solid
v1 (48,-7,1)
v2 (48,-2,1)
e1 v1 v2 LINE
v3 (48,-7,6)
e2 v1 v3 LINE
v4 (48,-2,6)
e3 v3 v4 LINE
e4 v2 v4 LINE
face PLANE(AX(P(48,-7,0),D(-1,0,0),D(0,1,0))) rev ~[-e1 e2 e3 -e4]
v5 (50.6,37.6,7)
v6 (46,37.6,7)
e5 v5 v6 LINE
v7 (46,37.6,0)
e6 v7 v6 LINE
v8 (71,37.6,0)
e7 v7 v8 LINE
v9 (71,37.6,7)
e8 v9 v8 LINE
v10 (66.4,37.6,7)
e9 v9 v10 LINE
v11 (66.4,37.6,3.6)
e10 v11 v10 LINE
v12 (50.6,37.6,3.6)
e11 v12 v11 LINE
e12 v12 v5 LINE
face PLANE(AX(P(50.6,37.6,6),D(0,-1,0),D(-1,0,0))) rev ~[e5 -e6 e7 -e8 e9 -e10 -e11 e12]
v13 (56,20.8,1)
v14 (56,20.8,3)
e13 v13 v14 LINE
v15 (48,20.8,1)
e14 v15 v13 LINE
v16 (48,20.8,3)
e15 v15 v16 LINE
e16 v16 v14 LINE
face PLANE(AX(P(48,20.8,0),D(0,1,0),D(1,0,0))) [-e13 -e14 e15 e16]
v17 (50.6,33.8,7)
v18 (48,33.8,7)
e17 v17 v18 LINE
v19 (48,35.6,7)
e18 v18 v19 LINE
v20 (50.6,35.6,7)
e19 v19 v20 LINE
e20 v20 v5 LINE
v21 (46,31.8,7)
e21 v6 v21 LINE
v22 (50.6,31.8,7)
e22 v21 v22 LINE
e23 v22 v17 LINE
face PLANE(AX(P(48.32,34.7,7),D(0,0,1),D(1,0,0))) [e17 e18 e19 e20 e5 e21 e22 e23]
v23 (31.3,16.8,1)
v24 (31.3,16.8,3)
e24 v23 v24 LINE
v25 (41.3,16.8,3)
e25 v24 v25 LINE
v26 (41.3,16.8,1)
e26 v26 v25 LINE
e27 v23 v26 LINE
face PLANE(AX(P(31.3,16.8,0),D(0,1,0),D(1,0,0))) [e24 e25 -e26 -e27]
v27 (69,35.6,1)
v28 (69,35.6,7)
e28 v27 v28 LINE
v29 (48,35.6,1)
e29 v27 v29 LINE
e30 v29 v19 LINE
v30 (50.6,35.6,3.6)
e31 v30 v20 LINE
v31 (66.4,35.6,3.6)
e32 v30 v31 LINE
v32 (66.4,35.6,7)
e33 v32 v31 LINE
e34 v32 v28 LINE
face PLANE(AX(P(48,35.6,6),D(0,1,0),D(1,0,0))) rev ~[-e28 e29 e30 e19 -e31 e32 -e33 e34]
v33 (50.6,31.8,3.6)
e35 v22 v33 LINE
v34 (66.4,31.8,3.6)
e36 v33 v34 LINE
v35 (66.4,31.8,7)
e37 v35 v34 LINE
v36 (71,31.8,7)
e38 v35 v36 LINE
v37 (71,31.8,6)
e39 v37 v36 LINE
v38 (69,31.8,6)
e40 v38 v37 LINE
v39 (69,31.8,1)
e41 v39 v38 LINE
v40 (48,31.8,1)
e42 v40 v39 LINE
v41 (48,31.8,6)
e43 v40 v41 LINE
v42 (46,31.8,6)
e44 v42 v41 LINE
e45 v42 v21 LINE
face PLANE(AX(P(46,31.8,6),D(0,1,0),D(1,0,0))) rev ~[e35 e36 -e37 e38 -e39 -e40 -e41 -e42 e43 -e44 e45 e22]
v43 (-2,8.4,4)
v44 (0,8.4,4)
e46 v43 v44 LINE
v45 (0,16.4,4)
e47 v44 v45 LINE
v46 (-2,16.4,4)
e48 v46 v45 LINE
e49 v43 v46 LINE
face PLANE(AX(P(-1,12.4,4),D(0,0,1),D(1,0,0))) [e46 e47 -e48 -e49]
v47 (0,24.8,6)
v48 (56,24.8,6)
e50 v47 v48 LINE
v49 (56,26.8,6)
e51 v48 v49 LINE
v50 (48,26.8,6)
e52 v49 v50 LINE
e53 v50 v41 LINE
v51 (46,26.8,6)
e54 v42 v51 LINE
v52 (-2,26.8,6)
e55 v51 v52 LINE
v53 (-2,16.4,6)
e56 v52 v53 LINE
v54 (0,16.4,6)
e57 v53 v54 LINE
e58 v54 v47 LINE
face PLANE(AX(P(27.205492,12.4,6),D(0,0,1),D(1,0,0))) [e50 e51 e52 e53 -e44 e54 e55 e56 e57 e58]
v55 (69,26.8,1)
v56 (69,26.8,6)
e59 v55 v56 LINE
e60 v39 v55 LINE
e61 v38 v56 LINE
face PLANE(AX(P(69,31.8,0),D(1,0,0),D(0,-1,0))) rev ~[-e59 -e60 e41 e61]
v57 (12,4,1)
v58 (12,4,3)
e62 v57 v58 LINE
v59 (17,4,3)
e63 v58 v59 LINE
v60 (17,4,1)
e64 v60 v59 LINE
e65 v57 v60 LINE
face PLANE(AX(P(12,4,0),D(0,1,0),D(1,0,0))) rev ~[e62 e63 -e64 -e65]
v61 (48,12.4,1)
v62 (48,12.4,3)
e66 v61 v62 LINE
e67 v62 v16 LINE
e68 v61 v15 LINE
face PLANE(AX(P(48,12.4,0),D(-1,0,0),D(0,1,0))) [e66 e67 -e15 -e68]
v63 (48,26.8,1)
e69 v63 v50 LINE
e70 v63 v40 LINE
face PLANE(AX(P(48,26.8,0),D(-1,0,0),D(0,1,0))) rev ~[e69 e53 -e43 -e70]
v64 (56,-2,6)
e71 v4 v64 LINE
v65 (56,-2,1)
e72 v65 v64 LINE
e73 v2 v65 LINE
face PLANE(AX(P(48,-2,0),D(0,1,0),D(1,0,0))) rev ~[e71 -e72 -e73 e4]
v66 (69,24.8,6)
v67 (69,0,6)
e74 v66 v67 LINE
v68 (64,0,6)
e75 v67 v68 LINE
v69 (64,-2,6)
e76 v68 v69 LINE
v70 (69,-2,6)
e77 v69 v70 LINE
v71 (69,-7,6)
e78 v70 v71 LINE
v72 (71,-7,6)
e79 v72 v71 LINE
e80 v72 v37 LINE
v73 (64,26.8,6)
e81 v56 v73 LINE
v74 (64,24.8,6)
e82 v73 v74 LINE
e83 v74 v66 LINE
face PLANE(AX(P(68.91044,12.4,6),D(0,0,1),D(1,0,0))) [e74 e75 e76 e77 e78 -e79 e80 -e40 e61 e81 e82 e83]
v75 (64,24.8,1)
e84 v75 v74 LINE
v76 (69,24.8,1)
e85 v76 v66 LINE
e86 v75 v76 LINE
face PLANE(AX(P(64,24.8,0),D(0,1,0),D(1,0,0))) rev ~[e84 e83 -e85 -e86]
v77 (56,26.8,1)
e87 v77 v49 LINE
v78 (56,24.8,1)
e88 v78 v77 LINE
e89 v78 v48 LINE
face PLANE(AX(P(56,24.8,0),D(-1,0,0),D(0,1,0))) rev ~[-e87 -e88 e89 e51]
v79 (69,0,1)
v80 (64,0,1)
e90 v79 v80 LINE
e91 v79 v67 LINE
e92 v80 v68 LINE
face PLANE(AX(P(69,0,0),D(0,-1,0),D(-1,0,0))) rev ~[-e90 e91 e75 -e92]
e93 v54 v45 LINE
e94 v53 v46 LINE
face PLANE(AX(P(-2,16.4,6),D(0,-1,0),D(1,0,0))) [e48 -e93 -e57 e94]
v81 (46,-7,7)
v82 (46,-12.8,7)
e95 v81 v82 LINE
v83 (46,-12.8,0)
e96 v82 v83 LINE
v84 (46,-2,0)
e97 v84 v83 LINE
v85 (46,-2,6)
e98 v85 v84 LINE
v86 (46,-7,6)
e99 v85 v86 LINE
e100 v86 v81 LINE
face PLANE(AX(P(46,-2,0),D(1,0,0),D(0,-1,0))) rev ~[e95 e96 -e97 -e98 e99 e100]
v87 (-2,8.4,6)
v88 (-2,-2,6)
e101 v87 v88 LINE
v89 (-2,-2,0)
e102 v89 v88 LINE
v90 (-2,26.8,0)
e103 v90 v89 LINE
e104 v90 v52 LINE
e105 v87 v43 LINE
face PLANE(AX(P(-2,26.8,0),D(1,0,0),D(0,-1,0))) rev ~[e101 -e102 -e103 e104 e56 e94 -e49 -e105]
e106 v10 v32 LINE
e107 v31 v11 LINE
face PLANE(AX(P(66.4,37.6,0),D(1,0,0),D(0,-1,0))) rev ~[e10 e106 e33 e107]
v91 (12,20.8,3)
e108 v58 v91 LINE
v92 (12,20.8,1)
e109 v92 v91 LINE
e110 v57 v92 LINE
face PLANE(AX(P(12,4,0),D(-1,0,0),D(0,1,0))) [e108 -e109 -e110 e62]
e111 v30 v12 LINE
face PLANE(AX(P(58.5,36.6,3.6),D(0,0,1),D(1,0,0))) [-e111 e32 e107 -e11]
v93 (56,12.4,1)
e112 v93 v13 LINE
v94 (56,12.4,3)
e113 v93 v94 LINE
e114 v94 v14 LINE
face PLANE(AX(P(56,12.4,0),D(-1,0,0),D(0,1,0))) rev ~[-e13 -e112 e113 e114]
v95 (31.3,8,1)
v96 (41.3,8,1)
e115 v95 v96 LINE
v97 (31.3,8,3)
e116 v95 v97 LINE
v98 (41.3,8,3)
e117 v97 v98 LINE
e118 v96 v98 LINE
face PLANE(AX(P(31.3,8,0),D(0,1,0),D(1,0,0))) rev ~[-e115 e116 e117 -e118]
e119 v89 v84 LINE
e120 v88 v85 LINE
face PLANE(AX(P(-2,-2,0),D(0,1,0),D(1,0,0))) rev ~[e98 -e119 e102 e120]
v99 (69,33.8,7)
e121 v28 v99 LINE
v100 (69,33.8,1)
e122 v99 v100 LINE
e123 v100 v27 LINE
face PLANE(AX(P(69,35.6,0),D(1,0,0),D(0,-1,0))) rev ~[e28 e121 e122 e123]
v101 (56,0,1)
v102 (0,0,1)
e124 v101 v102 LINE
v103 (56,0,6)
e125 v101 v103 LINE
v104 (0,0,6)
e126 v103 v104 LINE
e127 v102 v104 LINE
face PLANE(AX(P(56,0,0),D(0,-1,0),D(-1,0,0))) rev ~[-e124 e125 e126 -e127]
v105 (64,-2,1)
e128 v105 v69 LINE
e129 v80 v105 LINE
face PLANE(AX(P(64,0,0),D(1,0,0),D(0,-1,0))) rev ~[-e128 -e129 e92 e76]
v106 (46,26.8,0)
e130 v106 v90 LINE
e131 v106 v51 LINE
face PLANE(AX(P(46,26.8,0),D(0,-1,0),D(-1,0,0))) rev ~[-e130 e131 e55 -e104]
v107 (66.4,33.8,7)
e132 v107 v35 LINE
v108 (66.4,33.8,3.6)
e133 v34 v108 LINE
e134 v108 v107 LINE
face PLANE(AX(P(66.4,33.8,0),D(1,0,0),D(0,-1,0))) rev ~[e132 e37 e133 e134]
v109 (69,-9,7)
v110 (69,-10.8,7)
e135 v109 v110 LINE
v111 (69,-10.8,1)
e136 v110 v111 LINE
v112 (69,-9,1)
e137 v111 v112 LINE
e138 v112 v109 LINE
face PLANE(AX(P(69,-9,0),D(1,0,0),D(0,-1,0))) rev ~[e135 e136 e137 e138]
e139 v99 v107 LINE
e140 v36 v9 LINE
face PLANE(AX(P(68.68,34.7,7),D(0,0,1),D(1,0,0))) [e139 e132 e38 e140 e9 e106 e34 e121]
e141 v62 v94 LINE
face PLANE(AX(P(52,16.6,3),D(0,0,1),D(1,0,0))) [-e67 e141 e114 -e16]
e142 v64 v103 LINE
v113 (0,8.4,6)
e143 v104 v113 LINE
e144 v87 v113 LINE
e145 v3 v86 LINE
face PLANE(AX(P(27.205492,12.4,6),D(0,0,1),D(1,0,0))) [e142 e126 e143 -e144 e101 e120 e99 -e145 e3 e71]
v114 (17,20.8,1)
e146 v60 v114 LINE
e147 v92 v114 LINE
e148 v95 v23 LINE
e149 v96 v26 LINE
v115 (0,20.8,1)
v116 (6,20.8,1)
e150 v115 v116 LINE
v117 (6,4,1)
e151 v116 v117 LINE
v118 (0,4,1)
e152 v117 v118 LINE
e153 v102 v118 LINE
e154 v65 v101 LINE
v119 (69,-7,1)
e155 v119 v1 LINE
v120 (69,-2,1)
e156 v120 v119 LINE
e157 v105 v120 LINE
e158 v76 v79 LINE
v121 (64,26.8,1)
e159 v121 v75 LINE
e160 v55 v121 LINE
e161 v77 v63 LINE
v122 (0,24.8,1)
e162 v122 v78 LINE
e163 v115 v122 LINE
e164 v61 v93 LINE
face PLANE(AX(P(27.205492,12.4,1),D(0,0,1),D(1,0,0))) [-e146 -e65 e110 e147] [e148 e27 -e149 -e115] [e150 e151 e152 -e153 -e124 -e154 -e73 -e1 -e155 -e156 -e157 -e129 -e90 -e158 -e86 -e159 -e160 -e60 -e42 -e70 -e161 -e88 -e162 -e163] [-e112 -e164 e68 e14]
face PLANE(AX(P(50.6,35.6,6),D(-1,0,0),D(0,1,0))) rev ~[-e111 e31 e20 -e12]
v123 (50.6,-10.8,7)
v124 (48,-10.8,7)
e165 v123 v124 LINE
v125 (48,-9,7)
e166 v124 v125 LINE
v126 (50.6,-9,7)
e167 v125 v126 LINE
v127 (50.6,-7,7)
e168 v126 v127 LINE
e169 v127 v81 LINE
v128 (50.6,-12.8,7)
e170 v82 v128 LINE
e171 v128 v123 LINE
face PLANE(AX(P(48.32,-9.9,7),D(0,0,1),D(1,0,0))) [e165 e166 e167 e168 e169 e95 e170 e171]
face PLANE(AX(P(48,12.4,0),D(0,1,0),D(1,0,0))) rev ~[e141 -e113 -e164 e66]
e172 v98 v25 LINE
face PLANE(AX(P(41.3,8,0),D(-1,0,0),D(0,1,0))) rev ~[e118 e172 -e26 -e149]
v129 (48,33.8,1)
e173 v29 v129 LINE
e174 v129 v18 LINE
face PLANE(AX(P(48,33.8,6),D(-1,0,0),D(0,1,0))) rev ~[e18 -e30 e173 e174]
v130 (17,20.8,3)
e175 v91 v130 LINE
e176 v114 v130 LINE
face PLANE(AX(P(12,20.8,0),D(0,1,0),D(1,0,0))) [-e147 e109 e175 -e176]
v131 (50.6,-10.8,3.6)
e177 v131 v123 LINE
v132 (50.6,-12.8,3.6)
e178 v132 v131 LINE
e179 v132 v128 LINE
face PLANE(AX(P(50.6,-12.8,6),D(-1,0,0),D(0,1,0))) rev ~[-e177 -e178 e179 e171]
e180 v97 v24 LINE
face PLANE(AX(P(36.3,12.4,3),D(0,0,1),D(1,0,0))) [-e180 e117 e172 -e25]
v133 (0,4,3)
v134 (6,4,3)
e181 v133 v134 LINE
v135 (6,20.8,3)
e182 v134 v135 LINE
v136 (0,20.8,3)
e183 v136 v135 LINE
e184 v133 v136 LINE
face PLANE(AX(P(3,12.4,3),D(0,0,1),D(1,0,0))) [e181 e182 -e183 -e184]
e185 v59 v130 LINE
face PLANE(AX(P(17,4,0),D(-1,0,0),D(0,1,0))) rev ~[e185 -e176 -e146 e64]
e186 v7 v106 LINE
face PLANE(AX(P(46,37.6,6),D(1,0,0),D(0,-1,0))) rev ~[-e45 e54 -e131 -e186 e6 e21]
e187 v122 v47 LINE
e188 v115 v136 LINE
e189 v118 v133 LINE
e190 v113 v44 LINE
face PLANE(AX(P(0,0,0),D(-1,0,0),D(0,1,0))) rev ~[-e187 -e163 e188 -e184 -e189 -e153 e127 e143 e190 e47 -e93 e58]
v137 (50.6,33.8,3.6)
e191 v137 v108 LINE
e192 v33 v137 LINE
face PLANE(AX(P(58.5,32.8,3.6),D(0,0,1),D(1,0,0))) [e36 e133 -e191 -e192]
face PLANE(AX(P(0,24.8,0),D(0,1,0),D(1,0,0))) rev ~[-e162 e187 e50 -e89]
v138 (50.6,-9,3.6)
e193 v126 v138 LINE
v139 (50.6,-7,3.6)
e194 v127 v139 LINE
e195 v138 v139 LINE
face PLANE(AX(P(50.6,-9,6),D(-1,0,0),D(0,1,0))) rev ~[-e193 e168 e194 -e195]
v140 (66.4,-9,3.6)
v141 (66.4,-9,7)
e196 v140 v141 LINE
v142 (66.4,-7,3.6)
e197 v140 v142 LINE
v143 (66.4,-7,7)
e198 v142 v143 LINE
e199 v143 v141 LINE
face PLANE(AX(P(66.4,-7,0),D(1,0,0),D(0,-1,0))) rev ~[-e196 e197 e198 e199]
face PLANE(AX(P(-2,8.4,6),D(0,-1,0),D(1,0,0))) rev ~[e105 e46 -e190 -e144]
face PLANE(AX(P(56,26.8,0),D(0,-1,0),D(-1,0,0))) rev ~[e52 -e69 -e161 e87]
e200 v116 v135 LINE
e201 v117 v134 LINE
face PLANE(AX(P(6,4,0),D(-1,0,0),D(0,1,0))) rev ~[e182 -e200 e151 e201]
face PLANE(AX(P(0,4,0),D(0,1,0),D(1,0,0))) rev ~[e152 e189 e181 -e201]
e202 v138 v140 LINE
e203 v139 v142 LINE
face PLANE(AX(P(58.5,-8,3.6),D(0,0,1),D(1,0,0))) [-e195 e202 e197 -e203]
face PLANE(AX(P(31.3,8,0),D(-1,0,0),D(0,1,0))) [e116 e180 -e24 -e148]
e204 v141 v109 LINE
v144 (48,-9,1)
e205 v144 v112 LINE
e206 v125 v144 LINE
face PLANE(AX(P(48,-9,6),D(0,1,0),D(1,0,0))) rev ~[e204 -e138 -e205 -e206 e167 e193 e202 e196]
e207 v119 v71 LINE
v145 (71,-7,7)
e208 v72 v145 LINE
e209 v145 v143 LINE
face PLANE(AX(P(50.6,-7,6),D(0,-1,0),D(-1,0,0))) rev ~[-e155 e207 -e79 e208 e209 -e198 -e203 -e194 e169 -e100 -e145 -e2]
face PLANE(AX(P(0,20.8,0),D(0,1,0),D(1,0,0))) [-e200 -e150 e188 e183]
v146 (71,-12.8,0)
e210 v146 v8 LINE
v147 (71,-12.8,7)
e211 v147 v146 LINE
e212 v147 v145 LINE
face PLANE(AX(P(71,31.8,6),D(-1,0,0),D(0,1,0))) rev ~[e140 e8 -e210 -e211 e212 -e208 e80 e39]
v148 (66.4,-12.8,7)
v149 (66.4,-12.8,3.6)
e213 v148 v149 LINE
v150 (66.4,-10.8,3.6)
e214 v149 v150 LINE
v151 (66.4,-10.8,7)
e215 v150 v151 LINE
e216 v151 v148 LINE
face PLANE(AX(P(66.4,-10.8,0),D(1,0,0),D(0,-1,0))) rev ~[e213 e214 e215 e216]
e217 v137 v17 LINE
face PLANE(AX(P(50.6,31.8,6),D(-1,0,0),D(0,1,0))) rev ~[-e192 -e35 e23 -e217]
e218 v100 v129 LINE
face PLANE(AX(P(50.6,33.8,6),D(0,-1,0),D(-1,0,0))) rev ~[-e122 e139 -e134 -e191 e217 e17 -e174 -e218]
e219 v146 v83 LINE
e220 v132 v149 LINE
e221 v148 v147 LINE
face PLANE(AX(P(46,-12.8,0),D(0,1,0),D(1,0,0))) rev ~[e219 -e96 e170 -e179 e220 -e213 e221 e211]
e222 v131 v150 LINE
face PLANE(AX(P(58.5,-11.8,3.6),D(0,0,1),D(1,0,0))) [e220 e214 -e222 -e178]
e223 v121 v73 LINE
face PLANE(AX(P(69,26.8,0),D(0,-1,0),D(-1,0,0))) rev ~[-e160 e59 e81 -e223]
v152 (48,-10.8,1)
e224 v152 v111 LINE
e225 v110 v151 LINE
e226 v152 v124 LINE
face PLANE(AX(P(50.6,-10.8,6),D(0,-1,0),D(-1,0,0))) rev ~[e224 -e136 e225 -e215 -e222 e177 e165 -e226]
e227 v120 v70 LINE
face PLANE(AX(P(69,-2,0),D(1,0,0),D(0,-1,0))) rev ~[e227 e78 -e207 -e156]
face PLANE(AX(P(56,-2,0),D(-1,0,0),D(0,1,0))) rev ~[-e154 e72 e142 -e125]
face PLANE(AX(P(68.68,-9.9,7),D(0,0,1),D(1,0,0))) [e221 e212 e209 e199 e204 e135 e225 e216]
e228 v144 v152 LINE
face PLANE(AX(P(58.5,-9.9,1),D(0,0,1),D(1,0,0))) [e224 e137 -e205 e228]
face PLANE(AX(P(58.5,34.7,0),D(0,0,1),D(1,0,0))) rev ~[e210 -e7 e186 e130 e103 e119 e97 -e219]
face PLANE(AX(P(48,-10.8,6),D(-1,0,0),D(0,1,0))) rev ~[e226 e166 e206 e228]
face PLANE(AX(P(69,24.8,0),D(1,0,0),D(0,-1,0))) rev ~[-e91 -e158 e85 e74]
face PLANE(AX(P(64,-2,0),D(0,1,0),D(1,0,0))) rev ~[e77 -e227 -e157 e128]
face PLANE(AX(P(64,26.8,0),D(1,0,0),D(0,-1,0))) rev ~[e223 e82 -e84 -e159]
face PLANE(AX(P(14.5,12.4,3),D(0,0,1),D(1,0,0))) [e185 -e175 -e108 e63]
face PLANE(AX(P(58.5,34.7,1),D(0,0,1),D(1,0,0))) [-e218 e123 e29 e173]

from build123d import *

# Parameters (mm, degrees)
F0_W      = 6
F0_H      = 16.8
F1_DEPTH  = 3
F0_W_2    = 5
F0_W_3    = 10
F0_H_2    = 8.8
F0_W_4    = 8
F0_H_3    = 8.4
F2_DEPTH  = 6
F0_W_5    = 15.8
F0_H_4    = 2
F3_DEPTH  = 3.6
F4_DEPTH  = 1
F7_DEPTH  = 1
F8_DEPTH  = 1
F9_W      = 2
F9_H      = 8
F10_DEPTH = 2


# Not quite as in the source:
# - a feature names something its author has since deleted; it is built from what else it names


with BuildPart() as f1:
    # F0 (on Top) → F1 (new body)
    with BuildSketch(Plane.XY):
        with Locations((3, 12.4)):
            Rectangle(F0_W, F0_H)
    extrude(amount=F1_DEPTH)

    # F0 (on Top) → F2 (join)
    with BuildSketch(Plane.XY):
        Polygon((0, 4), (0, 20.8), (0, 24.8), (56, 24.8), (56, 26.8), (48, 26.8), (48, 31.8), (50.6, 31.8), (50.6, 33.8), (48, 33.8), (48, 35.6), (50.6, 35.6), (50.6, 37.6), (46, 37.6), (46, 26.8), (-2, 26.8), (-2, -2), (46, -2), (46, -12.8), (50.6, -12.8), (50.6, -10.8), (48, -10.8), (48, -9), (50.6, -9), (50.6, -7), (48, -7), (48, -2), (56, -2), (56, 0), (0, 0), align=None)
    extrude(amount=F2_DEPTH)



with BuildPart() as f1b:
    # F0 (on Top) → F1, piece 2 (new body)
    with BuildSketch(Plane.XY):
        with Locations((14.5, 12.4)):
            Rectangle(F0_W_2, F0_H)
    extrude(amount=F1_DEPTH)


with BuildPart() as f1c:
    # F0 (on Top) → F1, piece 3 (new body)
    with BuildSketch(Plane.XY):
        with Locations((36.3, 12.4)):
            Rectangle(F0_W_3, F0_H_2)
    extrude(amount=F1_DEPTH)


with BuildPart() as f1d:
    # F0 (on Top) → F1, piece 4 (new body)
    with BuildSketch(Plane.XY):
        with Locations((52, 16.6)):
            Rectangle(F0_W_4, F0_H_3)
    extrude(amount=F1_DEPTH)


with BuildPart() as f2:
    # F0 (on Top) → F2, piece 2 (new body)
    with BuildSketch(Plane.XY):
        Polygon((66.4, 33.8), (66.4, 31.8), (69, 31.8), (69, 26.8), (64, 26.8), (64, 24.8), (69, 24.8), (69, 0), (64, 0), (64, -2), (69, -2), (69, -7), (66.4, -7), (66.4, -9), (69, -9), (69, -10.8), (66.4, -10.8), (66.4, -12.8), (71, -12.8), (71, 37.6), (66.4, 37.6), (66.4, 35.6), (69, 35.6), (69, 33.8), align=None)
    extrude(amount=F2_DEPTH)


with BuildPart() as f1_1:
    add(f1.part)

    add(f2.part)  # F3 merges F2
    # F0 (on Top) → F3 (join)
    with BuildSketch(Plane.XY):
        with Locations((58.5, 36.6)):
            Rectangle(F0_W_5, F0_H_4)
        with Locations((58.5, 32.8)):
            Rectangle(F0_W_5, F0_H_4)
        with Locations((58.5, -8)):
            Rectangle(F0_W_5, F0_H_4)
        with Locations((58.5, -11.8)):
            Rectangle(F0_W_5, F0_H_4)
    extrude(amount=F3_DEPTH)

    # F0 (on Top) → F4 (join)
    with BuildSketch(Plane.XY):
        Polygon((48, 33.8), (50.6, 33.8), (66.4, 33.8), (69, 33.8), (69, 35.6), (66.4, 35.6), (50.6, 35.6), (48, 35.6), align=None)
        Polygon((66.4, -9), (50.6, -9), (48, -9), (48, -10.8), (50.6, -10.8), (66.4, -10.8), (69, -10.8), (69, -9), align=None)
    extrude(amount=F4_DEPTH)

    # F5 (on face) + F6 (on face) → F7 (join)
    with BuildSketch(Plane.XY.offset(6)):
        Polygon((48, 31.8), (50.6, 31.8), (50.6, 33.8), (48, 33.8), (48, 35.6), (50.6, 35.6), (50.6, 37.6), (46, 37.6), (46, 31.8), align=None)
        Polygon((48, -7), (46, -7), (46, -12.8), (50.6, -12.8), (50.6, -10.8), (48, -10.8), (48, -9), (50.6, -9), (50.6, -7), align=None)
    with BuildSketch(Plane.XY.offset(6)):
        Polygon((66.4, 33.8), (66.4, 31.8), (69, 31.8), (71, 31.8), (71, 37.6), (66.4, 37.6), (66.4, 35.6), (69, 35.6), (69, 33.8), align=None)
        Polygon((71, -12.8), (71, -7), (69, -7), (66.4, -7), (66.4, -9), (69, -9), (69, -10.8), (66.4, -10.8), (66.4, -12.8), align=None)
    extrude(amount=F7_DEPTH)


    add(f1b.part)  # F8 merges F1b

    add(f1c.part)  # F8 merges F1c

    add(f1d.part)  # F8 merges F1d
    # F0 (on Top) → F8 (join)
    with BuildSketch(Plane.XY):
        Polygon((0, 4), (0, 20.8), (0, 24.8), (56, 24.8), (56, 26.8), (48, 26.8), (48, 31.8), (50.6, 31.8), (50.6, 33.8), (48, 33.8), (48, 35.6), (50.6, 35.6), (50.6, 37.6), (46, 37.6), (46, 26.8), (-2, 26.8), (-2, -2), (46, -2), (46, -12.8), (50.6, -12.8), (50.6, -10.8), (48, -10.8), (48, -9), (50.6, -9), (50.6, -7), (48, -7), (48, -2), (56, -2), (56, 0), (0, 0), align=None)
        Polygon((66.4, 33.8), (66.4, 31.8), (69, 31.8), (69, 26.8), (64, 26.8), (64, 24.8), (69, 24.8), (69, 0), (64, 0), (64, -2), (69, -2), (69, -7), (66.4, -7), (66.4, -9), (69, -9), (69, -10.8), (66.4, -10.8), (66.4, -12.8), (71, -12.8), (71, 37.6), (66.4, 37.6), (66.4, 35.6), (69, 35.6), (69, 33.8), align=None)
        with Locations((58.5, 36.6)):
            Rectangle(F0_W_5, F0_H_4)
        with Locations((58.5, -11.8)):
            Rectangle(F0_W_5, F0_H_4)
        Polygon((0, 24.8), (0, 20.8), (6, 20.8), (6, 4), (0, 4), (0, 0), (56, 0), (56, -2), (48, -2), (48, -7), (50.6, -7), (66.4, -7), (69, -7), (69, -2), (64, -2), (64, 0), (69, 0), (69, 24.8), (64, 24.8), (64, 26.8), (69, 26.8), (69, 31.8), (66.4, 31.8), (50.6, 31.8), (48, 31.8), (48, 26.8), (56, 26.8), (56, 24.8), align=None)
        with Locations((14.5, 12.4)):
            Rectangle(F0_W_2, F0_H, mode=Mode.SUBTRACT)
        with Locations((36.3, 12.4)):
            Rectangle(F0_W_3, F0_H_2, mode=Mode.SUBTRACT)
        with Locations((52, 16.6)):
            Rectangle(F0_W_4, F0_H_3, mode=Mode.SUBTRACT)
    extrude(amount=F8_DEPTH)

    # F9 (on face) → F10 (cut)
    with BuildSketch(Plane.XY.offset(6)):
        with Locations((-1, 12.4)):
            Rectangle(F9_W, F9_H)
    extrude(amount=-F10_DEPTH, mode=Mode.SUBTRACT)


solid = f1_1.part
